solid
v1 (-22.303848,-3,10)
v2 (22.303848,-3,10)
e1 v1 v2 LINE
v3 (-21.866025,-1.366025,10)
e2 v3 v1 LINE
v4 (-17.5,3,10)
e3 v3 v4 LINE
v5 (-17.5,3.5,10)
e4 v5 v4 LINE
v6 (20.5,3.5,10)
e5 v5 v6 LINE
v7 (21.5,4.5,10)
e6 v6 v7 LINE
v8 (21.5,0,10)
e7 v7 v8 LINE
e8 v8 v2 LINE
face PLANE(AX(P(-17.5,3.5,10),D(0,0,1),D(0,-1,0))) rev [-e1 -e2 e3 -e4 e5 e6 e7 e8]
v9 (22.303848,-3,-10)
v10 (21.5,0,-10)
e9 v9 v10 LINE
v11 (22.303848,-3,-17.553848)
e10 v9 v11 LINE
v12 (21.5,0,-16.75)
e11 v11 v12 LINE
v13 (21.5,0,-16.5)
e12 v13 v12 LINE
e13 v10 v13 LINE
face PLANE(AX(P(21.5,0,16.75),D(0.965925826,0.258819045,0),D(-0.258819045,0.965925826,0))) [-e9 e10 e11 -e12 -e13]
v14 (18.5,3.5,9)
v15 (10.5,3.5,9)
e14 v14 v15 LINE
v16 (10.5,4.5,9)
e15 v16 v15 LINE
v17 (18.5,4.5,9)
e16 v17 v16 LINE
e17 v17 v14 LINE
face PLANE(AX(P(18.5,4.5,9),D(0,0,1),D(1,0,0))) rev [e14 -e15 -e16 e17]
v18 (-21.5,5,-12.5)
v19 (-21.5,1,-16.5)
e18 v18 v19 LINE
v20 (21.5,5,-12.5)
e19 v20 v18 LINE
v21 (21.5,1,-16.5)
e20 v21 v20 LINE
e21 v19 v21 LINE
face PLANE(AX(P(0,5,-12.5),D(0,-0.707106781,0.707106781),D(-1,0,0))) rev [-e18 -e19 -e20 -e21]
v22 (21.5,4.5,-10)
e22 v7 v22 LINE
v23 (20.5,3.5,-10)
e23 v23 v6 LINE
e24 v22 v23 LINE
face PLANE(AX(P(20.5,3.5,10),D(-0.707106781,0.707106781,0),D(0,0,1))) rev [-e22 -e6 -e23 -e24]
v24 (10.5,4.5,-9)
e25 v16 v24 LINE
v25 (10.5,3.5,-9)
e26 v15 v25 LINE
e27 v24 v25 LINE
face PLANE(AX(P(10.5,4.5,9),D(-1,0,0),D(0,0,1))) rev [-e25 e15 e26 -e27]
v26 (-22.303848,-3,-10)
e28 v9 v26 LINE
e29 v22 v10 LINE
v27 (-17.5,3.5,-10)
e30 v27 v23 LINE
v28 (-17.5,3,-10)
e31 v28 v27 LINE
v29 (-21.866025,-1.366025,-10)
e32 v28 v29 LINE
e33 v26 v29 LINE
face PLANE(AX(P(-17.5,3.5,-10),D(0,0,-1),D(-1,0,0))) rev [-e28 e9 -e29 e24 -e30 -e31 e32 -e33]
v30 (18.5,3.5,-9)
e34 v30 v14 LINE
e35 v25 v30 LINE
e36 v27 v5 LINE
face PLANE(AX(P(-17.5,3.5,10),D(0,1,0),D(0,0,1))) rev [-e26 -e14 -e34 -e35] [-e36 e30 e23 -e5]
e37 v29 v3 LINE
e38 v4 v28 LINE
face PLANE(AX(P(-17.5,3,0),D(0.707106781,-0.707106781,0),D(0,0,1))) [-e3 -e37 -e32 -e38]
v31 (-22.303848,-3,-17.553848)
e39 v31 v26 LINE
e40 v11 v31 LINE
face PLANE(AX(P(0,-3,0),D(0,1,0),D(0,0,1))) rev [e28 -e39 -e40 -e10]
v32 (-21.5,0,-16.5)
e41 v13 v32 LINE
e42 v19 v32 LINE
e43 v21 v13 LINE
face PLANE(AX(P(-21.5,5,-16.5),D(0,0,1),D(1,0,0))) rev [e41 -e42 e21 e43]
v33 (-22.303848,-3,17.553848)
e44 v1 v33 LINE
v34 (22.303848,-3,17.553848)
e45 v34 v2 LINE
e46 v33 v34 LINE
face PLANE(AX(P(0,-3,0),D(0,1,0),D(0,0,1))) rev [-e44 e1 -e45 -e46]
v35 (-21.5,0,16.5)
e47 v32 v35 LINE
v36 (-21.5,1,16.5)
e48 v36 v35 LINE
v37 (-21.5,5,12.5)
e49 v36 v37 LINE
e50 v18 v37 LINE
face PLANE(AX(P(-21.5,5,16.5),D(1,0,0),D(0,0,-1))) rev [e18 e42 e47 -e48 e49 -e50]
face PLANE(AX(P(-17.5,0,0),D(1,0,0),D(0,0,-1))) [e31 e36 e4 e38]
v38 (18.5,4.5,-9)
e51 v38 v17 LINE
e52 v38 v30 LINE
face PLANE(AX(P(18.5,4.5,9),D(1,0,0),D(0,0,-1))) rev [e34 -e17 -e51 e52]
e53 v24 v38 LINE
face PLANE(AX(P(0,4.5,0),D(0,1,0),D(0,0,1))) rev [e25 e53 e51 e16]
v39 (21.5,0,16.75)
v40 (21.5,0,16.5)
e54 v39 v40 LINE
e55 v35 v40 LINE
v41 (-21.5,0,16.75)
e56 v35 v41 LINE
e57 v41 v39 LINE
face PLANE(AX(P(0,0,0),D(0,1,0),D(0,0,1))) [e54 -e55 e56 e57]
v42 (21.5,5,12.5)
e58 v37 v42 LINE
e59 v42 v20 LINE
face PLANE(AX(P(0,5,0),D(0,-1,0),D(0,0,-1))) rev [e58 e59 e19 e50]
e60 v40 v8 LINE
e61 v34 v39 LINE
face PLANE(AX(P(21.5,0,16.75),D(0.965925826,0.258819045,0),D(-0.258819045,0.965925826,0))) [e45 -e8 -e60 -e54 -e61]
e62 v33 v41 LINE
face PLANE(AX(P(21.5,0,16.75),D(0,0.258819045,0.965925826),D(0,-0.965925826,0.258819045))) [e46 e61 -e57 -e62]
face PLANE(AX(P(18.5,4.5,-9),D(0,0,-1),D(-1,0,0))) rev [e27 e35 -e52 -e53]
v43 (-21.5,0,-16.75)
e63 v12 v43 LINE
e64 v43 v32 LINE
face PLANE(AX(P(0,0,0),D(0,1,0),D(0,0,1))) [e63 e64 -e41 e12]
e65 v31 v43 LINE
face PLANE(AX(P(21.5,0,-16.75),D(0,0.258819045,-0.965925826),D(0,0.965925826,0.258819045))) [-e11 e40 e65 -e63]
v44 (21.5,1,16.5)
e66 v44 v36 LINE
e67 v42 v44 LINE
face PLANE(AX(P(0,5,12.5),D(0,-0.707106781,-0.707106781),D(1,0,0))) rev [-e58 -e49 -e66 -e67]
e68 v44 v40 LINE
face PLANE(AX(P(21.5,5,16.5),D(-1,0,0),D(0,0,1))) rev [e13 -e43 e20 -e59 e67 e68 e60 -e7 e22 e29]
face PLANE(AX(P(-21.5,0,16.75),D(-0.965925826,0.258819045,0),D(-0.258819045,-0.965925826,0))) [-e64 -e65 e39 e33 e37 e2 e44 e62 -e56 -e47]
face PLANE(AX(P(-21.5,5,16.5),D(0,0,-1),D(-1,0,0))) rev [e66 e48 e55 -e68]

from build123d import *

# Parameters (mm, degrees)
SKETCH_1_W          = 43
SKETCH_1_H          = 33.5
EXTRUDE_1_DEPTH     = 3
EXTRUDE_1_DRAFT     = 15
SKETCH_2_W          = 43
SKETCH_2_H          = 33
EXTRUDE_2_DEPTH     = 5
SKETCH_3_W          = 20
SKETCH_3_H          = 7
CUT_EXTRUDE_1_DEPTH = 39
SKETCH_4_W          = 8
SKETCH_4_H          = 18
CUT_EXTRUDE_2_DEPTH = 1
CHAMFER_1_SIZE      = 1
CHAMFER_2_SIZE      = 6
CHAMFER_3_SIZE      = 4
SKETCH_5_W          = 20
SKETCH_5_H          = 3
CUT_EXTRUDE_3_DEPTH = 48.454342555


with BuildPart() as part:
    # Эскиз1 → Бобышка-Вытянуть1 (with draft: the straight prism first)
    with BuildSketch(Plane(origin=(0, 0, 0), x_dir=(1, 0, 0), z_dir=(0, 1, 0))):
        Rectangle(SKETCH_1_W, SKETCH_1_H)
    extrude(amount=-EXTRUDE_1_DEPTH)
    # Бобышка-Вытянуть1: the draft: its side faces are tilted about the plane it starts from
    extrude_1_sides = [part.faces().sort_by_distance(p)[0] for p in [
        (21.5, -1.5, 0),
        (0, -1.5, -16.75),
        (-21.5, -1.5, 0),
        (0, -1.5, 16.75),
    ]]
    draft(extrude_1_sides, Plane(origin=(0, 0, 0), x_dir=(1, 0, 0), z_dir=(0, 1, 0)), EXTRUDE_1_DRAFT)

    # Эскиз2 → Бобышка-Вытянуть2 (add)
    with BuildSketch(Plane(origin=(0, 0, 0), x_dir=(1, 0, 0), z_dir=(0, 1, 0))):
        Rectangle(SKETCH_2_W, SKETCH_2_H)
    extrude(amount=EXTRUDE_2_DEPTH)

    # Эскиз3 → Вырез-Вытянуть1 (cut)
    with BuildSketch(Plane(origin=(21.5, 0, 0), x_dir=(0, 0, -1), z_dir=(1, 0, 0))):
        Rectangle(SKETCH_3_W, SKETCH_3_H)
    extrude(amount=-CUT_EXTRUDE_1_DEPTH, mode=Mode.SUBTRACT)

    # Эскиз4 → Вырез-Вытянуть2 (cut)
    with BuildSketch(Plane.XZ.offset(-3.5)):
        with Locations((14.5, 0)):
            Rectangle(SKETCH_4_W, SKETCH_4_H)
    extrude(amount=-CUT_EXTRUDE_2_DEPTH, mode=Mode.SUBTRACT)

    # Фаска1
    chamfer_1_edges = [part.edges().sort_by_distance(p)[0] for p in [
        (21.5, 3.5, 0),
    ]]
    chamfer(chamfer_1_edges, length=CHAMFER_1_SIZE)

    # Фаска2
    # the kernel refuses this chamfer: 6 mm, written as the material it takes off along each edge
    with BuildSketch(Plane(origin=(-17.5, -3, -10), x_dir=(0.027495876610586202, 0.9996219169112968, 0), z_dir=(0, 0, 1))) as chamfer_2_piece_1:
        Polygon((CHAMFER_2_SIZE * 0.999621916911, CHAMFER_2_SIZE * 0.0274958766106), (-CHAMFER_2_SIZE * 0.0274958766106, CHAMFER_2_SIZE * 0.999621916911), (0, 0), align=None)
    extrude(amount=20, mode=Mode.SUBTRACT)

    # Фаска3
    chamfer_3_edges = [part.edges().sort_by_distance(p)[0] for p in [
        (0, 5, -16.5),
        (0, 5, 16.5),
    ]]
    chamfer(chamfer_3_edges, length=CHAMFER_3_SIZE)

    # Эскиз5 → Вырез-Вытянуть3 (cut, through all)
    with BuildSketch(Plane.ZY.offset(-21.5)):
        with Locations((0, -1.5)):
            Rectangle(SKETCH_5_W, SKETCH_5_H)
    extrude(amount=-CUT_EXTRUDE_3_DEPTH, mode=Mode.SUBTRACT)


solid = part.part
